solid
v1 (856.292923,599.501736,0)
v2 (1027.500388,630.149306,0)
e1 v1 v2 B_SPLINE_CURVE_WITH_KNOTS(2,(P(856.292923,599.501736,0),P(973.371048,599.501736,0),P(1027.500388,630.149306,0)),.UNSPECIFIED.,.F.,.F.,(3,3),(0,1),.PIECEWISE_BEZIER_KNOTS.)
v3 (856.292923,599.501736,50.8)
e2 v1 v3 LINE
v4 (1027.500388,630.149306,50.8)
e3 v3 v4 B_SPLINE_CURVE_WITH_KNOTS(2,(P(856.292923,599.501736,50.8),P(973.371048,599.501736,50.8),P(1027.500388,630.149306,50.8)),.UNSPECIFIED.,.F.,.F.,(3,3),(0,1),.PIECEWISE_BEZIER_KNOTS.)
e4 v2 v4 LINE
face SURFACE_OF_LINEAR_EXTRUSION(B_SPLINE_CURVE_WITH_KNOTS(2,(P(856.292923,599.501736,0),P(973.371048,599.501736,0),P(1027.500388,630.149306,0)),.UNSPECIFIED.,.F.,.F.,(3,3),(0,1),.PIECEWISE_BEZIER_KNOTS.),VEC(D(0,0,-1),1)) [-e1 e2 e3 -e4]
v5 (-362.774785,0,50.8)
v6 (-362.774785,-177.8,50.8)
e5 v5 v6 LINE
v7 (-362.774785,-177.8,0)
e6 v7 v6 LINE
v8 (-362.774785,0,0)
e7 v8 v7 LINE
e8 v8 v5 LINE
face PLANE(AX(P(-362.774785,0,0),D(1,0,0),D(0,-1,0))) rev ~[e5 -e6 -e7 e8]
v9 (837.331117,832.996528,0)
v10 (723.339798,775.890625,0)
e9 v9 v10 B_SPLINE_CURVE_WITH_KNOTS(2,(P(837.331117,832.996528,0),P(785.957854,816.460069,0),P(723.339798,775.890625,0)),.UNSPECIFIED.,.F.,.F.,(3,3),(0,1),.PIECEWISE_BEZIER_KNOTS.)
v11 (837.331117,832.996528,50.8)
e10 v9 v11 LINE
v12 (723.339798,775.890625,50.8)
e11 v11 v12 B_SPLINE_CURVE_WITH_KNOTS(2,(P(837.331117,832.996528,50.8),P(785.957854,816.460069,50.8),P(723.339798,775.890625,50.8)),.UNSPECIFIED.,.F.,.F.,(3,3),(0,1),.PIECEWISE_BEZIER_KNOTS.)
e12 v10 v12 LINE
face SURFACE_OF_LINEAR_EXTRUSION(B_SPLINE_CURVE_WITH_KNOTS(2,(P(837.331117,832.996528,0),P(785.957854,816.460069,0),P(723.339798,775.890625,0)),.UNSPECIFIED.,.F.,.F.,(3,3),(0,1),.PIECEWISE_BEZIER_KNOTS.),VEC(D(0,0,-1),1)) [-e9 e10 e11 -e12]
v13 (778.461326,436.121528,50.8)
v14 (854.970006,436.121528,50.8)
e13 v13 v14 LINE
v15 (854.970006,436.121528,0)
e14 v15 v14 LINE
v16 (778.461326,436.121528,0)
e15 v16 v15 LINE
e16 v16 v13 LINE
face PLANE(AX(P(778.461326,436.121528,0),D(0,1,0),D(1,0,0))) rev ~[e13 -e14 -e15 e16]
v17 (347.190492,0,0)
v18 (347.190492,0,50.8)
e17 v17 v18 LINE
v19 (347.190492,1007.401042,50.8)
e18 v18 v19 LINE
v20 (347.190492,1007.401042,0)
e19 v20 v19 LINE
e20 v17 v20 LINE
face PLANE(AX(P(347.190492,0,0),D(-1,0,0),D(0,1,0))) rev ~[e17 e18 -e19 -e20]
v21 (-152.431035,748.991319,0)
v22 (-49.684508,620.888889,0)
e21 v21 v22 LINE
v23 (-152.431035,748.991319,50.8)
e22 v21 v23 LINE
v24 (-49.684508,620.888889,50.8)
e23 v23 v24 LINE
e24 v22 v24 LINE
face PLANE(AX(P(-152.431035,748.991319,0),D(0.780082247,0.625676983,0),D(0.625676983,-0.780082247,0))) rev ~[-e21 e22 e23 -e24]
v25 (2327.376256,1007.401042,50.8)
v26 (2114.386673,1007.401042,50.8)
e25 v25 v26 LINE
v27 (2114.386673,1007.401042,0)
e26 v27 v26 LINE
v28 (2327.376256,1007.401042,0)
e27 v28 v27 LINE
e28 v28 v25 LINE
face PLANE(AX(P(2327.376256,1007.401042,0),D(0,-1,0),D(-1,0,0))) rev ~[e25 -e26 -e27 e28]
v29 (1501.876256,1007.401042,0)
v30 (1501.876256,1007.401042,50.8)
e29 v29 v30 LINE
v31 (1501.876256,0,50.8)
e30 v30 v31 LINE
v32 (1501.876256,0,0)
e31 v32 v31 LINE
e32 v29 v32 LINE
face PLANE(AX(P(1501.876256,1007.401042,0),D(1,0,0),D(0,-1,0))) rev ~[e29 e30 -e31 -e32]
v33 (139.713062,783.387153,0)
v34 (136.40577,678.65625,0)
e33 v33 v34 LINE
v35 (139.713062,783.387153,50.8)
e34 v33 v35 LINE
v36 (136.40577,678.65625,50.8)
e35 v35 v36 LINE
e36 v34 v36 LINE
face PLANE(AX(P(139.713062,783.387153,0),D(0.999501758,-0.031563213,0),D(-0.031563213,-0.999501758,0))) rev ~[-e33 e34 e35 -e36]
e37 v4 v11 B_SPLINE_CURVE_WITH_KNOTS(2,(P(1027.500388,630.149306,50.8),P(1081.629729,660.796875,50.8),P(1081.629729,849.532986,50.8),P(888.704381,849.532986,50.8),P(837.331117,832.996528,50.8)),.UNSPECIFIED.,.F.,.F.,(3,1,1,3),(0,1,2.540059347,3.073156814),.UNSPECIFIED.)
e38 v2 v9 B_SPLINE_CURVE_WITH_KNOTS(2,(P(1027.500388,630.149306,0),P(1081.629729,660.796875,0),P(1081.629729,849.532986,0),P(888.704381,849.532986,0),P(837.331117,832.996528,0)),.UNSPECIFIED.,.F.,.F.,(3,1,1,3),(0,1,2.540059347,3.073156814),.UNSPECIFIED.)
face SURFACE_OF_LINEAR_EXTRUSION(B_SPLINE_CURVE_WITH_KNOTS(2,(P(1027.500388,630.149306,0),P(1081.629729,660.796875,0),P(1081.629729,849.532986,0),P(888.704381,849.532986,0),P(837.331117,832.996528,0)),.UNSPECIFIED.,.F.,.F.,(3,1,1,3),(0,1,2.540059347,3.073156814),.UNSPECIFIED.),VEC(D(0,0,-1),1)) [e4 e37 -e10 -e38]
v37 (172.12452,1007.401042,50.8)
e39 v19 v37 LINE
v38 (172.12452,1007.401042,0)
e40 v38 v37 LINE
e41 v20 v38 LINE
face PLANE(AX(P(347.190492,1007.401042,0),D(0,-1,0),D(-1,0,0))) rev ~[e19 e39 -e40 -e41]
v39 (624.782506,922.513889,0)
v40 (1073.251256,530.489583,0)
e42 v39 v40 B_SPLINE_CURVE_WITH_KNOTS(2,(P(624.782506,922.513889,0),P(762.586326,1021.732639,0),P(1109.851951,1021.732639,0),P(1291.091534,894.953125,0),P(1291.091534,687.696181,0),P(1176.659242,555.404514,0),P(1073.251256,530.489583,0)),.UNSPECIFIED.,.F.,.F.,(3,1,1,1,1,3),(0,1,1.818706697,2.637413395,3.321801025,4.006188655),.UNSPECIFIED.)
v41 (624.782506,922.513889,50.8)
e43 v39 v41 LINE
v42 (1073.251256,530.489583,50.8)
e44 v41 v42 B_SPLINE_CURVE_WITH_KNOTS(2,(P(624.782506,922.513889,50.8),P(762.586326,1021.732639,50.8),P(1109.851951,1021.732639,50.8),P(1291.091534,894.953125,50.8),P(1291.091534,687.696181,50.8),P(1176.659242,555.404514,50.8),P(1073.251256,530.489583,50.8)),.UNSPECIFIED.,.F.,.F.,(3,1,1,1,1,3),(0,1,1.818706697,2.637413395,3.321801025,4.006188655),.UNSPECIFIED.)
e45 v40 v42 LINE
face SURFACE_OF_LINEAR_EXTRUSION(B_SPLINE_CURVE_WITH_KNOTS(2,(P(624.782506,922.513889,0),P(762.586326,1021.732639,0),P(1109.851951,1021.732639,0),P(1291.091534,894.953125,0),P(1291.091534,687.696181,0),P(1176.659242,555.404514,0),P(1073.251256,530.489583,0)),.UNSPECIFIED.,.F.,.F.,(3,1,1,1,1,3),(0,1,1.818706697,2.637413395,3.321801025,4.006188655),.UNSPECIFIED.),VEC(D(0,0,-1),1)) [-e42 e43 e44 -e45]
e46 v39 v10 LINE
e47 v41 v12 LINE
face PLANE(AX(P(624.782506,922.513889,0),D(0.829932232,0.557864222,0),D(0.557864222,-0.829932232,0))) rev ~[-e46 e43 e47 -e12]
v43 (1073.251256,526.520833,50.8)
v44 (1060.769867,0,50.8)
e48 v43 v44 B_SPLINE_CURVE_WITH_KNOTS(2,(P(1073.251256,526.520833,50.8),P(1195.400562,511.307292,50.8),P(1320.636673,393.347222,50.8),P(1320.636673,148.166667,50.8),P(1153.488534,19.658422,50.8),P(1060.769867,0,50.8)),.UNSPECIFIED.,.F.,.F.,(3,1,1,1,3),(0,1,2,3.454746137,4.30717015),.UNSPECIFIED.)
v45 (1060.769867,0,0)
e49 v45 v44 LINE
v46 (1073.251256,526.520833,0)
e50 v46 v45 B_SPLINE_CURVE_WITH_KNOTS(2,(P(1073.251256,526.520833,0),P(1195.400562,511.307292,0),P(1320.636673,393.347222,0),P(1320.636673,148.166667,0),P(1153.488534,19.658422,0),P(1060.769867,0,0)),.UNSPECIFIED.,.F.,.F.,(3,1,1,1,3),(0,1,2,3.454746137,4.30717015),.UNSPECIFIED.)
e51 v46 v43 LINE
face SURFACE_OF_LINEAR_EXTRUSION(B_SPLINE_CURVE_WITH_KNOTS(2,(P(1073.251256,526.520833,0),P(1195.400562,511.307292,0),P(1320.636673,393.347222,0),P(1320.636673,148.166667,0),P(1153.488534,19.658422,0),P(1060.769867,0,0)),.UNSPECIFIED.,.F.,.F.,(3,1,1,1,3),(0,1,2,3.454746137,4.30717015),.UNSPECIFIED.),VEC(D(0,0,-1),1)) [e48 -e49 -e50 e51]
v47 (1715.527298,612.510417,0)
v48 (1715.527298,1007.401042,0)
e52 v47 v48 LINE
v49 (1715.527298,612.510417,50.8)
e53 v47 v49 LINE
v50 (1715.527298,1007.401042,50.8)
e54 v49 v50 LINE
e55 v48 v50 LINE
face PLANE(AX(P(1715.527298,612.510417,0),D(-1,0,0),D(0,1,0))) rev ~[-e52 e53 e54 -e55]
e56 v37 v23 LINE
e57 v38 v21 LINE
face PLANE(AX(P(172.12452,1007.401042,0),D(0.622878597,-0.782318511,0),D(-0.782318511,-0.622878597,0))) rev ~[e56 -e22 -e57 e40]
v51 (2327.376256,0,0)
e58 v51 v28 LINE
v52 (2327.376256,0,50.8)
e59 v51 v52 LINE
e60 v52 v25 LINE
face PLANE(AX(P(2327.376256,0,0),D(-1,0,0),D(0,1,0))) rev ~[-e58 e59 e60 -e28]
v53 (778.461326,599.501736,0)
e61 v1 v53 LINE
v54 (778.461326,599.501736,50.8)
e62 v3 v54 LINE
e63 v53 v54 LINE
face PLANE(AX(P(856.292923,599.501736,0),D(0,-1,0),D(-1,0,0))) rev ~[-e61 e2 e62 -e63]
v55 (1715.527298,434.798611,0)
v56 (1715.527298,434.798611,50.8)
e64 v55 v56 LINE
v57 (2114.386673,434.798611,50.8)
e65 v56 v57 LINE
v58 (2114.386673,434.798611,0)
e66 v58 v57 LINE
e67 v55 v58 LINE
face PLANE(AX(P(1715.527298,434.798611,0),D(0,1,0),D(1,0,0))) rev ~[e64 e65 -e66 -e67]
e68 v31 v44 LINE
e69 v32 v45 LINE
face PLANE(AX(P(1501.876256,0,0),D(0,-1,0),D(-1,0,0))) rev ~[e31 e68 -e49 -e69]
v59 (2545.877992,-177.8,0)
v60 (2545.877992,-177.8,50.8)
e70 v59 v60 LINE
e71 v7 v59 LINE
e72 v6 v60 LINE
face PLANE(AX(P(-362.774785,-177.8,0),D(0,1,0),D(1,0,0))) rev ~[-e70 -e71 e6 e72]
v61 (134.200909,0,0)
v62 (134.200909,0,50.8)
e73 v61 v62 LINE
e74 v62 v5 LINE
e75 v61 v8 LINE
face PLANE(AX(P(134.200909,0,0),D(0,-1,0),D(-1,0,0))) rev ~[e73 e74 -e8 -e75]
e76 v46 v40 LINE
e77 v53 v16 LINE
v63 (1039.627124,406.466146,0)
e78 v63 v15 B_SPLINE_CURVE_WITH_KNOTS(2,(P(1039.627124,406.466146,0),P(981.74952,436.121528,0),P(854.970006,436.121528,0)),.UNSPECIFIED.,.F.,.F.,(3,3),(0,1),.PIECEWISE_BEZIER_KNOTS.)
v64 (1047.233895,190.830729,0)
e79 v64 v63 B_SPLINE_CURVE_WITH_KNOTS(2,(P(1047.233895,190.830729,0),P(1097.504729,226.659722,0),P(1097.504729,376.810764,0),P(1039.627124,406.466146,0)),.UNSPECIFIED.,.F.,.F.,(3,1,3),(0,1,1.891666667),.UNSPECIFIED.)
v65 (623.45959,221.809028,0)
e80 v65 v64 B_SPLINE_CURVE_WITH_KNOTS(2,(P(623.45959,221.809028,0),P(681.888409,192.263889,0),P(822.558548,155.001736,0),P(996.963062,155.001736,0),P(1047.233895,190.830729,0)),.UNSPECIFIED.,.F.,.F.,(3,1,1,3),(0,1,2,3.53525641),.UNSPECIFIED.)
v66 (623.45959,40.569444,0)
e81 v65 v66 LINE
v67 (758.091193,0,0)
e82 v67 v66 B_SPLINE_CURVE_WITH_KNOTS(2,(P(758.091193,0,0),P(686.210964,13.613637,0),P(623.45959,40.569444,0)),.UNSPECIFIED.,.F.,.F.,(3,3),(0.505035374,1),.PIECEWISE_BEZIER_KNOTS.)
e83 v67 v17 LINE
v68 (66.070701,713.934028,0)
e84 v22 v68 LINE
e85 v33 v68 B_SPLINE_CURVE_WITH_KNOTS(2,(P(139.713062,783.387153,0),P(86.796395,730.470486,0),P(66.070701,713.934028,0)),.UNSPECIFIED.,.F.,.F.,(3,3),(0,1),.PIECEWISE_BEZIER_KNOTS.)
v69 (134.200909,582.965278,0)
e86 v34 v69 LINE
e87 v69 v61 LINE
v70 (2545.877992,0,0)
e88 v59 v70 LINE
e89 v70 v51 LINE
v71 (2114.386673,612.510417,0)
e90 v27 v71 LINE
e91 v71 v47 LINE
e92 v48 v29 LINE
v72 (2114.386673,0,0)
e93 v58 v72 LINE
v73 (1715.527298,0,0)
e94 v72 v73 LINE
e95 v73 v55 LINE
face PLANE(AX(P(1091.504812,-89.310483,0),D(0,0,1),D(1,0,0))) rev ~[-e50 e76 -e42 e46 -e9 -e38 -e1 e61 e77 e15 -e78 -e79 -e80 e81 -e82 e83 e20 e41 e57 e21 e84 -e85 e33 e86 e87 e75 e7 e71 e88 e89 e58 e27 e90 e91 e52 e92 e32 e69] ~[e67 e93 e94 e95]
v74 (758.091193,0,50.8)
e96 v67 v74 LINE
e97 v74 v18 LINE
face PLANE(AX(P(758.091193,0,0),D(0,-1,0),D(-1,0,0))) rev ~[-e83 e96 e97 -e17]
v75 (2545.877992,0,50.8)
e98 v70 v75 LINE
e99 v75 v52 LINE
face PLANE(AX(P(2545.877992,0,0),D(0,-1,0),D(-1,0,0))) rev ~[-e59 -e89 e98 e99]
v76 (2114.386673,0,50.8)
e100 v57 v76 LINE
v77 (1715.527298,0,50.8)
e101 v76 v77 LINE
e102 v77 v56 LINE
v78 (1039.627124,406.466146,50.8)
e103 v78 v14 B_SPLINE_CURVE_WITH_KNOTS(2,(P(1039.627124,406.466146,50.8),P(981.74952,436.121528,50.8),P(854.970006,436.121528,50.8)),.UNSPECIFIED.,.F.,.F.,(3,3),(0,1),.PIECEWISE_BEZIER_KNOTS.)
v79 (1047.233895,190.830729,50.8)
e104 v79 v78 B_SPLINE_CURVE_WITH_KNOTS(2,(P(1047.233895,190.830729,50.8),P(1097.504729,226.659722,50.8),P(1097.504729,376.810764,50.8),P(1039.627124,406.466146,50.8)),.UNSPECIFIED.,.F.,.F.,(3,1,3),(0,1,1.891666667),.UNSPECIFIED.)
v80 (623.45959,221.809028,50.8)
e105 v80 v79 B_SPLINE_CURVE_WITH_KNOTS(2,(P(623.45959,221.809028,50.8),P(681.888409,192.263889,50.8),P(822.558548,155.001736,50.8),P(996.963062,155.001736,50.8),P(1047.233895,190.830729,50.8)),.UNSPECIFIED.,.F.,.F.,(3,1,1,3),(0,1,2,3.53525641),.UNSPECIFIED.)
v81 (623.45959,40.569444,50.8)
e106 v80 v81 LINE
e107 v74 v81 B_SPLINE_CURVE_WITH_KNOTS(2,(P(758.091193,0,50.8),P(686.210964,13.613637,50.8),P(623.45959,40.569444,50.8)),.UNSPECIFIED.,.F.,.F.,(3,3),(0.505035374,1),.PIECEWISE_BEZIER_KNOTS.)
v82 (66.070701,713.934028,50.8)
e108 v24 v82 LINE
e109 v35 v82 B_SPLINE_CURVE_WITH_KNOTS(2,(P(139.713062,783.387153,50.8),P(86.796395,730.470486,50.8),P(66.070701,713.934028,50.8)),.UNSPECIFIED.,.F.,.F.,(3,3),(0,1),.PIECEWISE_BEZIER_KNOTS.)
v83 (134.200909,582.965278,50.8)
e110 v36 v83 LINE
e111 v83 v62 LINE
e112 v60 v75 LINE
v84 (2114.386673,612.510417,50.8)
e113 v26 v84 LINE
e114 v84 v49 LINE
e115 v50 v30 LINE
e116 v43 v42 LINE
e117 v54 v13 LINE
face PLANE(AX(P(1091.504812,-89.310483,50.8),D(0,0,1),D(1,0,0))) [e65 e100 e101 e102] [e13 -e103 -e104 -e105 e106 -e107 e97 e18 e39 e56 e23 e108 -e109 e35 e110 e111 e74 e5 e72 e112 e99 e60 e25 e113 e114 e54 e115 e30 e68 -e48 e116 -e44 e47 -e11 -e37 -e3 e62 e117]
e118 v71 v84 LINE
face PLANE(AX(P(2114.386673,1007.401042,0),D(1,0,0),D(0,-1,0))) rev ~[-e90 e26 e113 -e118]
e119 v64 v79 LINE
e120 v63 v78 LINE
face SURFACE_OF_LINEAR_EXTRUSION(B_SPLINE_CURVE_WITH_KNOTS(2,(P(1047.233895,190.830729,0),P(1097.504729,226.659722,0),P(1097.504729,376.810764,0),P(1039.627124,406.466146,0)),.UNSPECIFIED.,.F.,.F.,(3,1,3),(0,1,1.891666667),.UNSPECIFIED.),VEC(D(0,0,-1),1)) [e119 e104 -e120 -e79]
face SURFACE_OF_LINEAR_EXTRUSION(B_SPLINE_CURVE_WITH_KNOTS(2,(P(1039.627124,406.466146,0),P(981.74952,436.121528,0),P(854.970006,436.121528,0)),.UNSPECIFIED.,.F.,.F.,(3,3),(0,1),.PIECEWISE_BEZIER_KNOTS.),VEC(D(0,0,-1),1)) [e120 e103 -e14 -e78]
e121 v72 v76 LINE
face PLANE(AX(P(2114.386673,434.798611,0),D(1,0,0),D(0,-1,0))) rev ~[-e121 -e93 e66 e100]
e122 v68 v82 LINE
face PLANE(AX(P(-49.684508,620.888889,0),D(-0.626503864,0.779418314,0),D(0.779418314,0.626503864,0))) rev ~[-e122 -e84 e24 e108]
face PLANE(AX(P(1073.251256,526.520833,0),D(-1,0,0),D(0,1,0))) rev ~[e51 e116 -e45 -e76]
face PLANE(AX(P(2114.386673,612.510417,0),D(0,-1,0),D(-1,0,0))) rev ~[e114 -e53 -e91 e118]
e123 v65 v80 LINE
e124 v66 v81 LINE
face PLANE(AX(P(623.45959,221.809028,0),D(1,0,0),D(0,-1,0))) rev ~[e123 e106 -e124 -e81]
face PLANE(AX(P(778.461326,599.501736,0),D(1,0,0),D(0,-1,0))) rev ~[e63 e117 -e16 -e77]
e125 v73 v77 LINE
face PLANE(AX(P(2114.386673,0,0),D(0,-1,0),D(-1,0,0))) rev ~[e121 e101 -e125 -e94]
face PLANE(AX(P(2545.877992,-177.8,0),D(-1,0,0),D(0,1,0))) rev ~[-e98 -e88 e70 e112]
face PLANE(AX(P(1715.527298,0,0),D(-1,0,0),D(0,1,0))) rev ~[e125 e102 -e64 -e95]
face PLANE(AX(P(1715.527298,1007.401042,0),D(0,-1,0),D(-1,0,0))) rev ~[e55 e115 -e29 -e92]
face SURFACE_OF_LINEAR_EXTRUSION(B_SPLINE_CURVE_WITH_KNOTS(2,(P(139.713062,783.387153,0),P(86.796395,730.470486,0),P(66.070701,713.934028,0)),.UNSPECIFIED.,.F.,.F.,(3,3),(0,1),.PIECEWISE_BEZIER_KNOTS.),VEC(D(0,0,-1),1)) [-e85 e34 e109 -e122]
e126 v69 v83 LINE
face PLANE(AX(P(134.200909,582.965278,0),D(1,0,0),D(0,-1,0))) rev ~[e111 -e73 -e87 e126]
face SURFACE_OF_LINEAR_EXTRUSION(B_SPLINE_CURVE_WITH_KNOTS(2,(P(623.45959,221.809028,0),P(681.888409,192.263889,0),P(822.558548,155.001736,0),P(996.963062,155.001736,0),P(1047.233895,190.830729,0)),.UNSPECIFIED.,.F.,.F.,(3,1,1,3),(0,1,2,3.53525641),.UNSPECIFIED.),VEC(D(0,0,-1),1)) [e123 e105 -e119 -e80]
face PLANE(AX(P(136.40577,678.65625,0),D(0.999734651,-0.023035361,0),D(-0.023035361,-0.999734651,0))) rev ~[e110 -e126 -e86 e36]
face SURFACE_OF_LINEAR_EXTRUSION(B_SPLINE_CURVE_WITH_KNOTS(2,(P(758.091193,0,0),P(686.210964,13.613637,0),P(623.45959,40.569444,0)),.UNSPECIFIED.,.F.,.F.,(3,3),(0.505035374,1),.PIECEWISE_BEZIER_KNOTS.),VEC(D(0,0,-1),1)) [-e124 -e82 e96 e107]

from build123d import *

# Parameters (mm, degrees)
F1_DEPTH = 50.8


# Not quite as in the source:
# - a feature names something its author has since deleted; it is built from what else it names


with BuildPart() as f1:
    # F0 (on Top) → F1 (new body)
    with BuildSketch(Plane.XY):
        with BuildLine():
            Line((-362.7747852802, 0), (-362.7747852802, -177.8))
            Line((-362.7747852802, -177.8), (2545.8779924975, -177.8))
            Line((2545.8779924975, -177.8), (2545.8779924975, 0))
            Line((2545.8779924975, 0), (2327.3762563864, 0))
            Line((2327.3762563864, 0), (2114.3866730531, 0))
            Line((2114.3866730531, 0), (1715.5272980531, 0))
            Line((1715.5272980531, 0), (1501.8762563864, 0))
            Line((1501.8762563864, 0), (1060.7698674064, 0))
            add(Edge.make_bspline(
                [(1060.7698674064, 0), (995.2549319361, -13.890625), (914.2807702753, -13.890625)],
                knots=[0.5859606644, 0.5859606644, 0.5859606644, 1, 1, 1], degree=2))
            add(Edge.make_bspline(
                [(914.2807702753, -13.890625), (831.4339258388, -13.890625), (758.0911932443, 0)],
                knots=[0, 0, 0, 0.5050353738, 0.5050353738, 0.5050353738], degree=2))
            Line((758.0911932443, 0), (347.1904924976, 0))
            Line((347.1904924976, 0), (134.2009091642, 0))
            Line((134.2009091642, 0), (-362.7747852802, 0))
        make_face()
        with BuildLine():
            Line((1060.7698674064, 0), (758.0911932443, 0))
            add(Edge.make_bspline(
                [(914.2807702753, -13.890625), (831.4339258388, -13.890625), (758.0911932443, 0)],
                knots=[0, 0, 0, 0.5050353738, 0.5050353738, 0.5050353738], degree=2))
            add(Edge.make_bspline(
                [(1060.7698674064, 0), (995.2549319361, -13.890625), (914.2807702753, -13.890625)],
                knots=[0.5859606644, 0.5859606644, 0.5859606644, 1, 1, 1], degree=2))
        make_face()
        with BuildLine():
            add(Edge.make_bspline(
                [(758.0911932443, 0), (686.2109644272, 13.6136365267), (623.4595897198, 40.5694444444)],
                knots=[0.5050353738, 0.5050353738, 0.5050353738, 1, 1, 1], degree=2))
            Line((758.0911932443, 0), (1060.7698674064, 0))
            add(Edge.make_bspline(
                [(1215.244311942, 67.1380208333), (1153.4885340032, 19.6584216858), (1060.7698674064, 0)],
                knots=[0, 0, 0, 0.5859606644, 0.5859606644, 0.5859606644], degree=2))
            add(Edge.make_bspline(
                [(1320.6366730531, 293.4670138889), (1320.6366730531, 148.1666666667), (1215.244311942, 67.1380208333)],
                knots=[0, 0, 0, 1, 1, 1], degree=2))
            add(Edge.make_bspline(
                [(1258.0186174976, 452.3272569444), (1320.6366730531, 393.3472222222), (1320.6366730531, 293.4670138889)],
                knots=[0, 0, 0, 1, 1, 1], degree=2))
            add(Edge.make_bspline(
                [(1073.2512563864, 526.5208333333), (1195.400561942, 511.3072916667), (1258.0186174976, 452.3272569444)],
                knots=[0, 0, 0, 1, 1, 1], degree=2))
            Line((1073.2512563864, 526.5208333333), (1073.2512563864, 530.4895833333))
            add(Edge.make_bspline(
                [(1233.8753883309, 621.5503472222), (1176.6592424976, 555.4045138889), (1073.2512563864, 530.4895833333)],
                knots=[0, 0, 0, 1, 1, 1], degree=2))
            add(Edge.make_bspline(
                [(1291.0915341642, 782.0642361111), (1291.0915341642, 687.6961805556), (1233.8753883309, 621.5503472222)],
                knots=[0, 0, 0, 1, 1, 1], degree=2))
            add(Edge.make_bspline(
                [(1200.4717424976, 958.3428819444), (1291.0915341642, 894.953125), (1291.0915341642, 782.0642361111)],
                knots=[0, 0, 0, 1, 1, 1], degree=2))
            add(Edge.make_bspline(
                [(953.5272980531, 1021.7326388889), (1109.8519508309, 1021.7326388889), (1200.4717424976, 958.3428819444)],
                knots=[0, 0, 0, 1, 1, 1], degree=2))
            add(Edge.make_bspline(
                [(624.7825063864, 922.5138888889), (762.5863258309, 1021.7326388889), (953.5272980531, 1021.7326388889)],
                knots=[0, 0, 0, 1, 1, 1], degree=2))
            Line((624.7825063864, 922.5138888889), (723.3397980531, 775.890625))
            add(Edge.make_bspline(
                [(837.3311174976, 832.9965277778), (785.9578536087, 816.4600694444), (723.3397980531, 775.890625)],
                knots=[0, 0, 0, 1, 1, 1], degree=2))
            add(Edge.make_bspline(
                [(938.3137563864, 849.5329861111), (888.7043813864, 849.5329861111), (837.3311174976, 832.9965277778)],
                knots=[0, 0, 0, 1, 1, 1], degree=2))
            add(Edge.make_bspline(
                [(1081.6297286087, 735.1006944444), (1081.6297286087, 849.5329861111), (938.3137563864, 849.5329861111)],
                knots=[0, 0, 0, 1, 1, 1], degree=2))
            add(Edge.make_bspline(
                [(1027.5003883309, 630.1493055556), (1081.6297286087, 660.796875), (1081.6297286087, 735.1006944444)],
                knots=[0, 0, 0, 1, 1, 1], degree=2))
            add(Edge.make_bspline(
                [(856.2929230531, 599.5017361111), (973.3710480531, 599.5017361111), (1027.5003883309, 630.1493055556)],
                knots=[0, 0, 0, 1, 1, 1], degree=2))
            Line((856.2929230531, 599.5017361111), (778.4613258309, 599.5017361111))
            Line((778.4613258309, 599.5017361111), (778.4613258309, 436.1215277778))
            Line((778.4613258309, 436.1215277778), (854.9700063864, 436.1215277778))
            add(Edge.make_bspline(
                [(1039.627124442, 406.4661458333), (981.7495202753, 436.1215277778), (854.9700063864, 436.1215277778)],
                knots=[0, 0, 0, 1, 1, 1], degree=2))
            add(Edge.make_bspline(
                [(1097.5047286087, 306.0347222222), (1097.5047286087, 376.8107638889), (1039.627124442, 406.4661458333)],
                knots=[0, 0, 0, 1, 1, 1], degree=2))
            add(Edge.make_bspline(
                [(1047.2338952753, 190.8307291667), (1097.5047286087, 226.6597222222), (1097.5047286087, 306.0347222222)],
                knots=[0, 0, 0, 1, 1, 1], degree=2))
            add(Edge.make_bspline(
                [(891.3502147198, 155.0017361111), (996.963061942, 155.0017361111), (1047.2338952753, 190.8307291667)],
                knots=[0, 0, 0, 1, 1, 1], degree=2))
            add(Edge.make_bspline(
                [(752.2234786087, 173.6328125), (822.5585480531, 155.0017361111), (891.3502147198, 155.0017361111)],
                knots=[0, 0, 0, 1, 1, 1], degree=2))
            add(Edge.make_bspline(
                [(623.4595897198, 221.8090277778), (681.8884091642, 192.2638888889), (752.2234786087, 173.6328125)],
                knots=[0, 0, 0, 1, 1, 1], degree=2))
            Line((623.4595897198, 221.8090277778), (623.4595897198, 40.5694444444))
        make_face()
        Polygon((2114.3866730531, 0), (2327.3762563864, 0), (2327.3762563864, 1007.4010416667), (2114.3866730531, 1007.4010416667), (2114.3866730531, 612.5104166667), (1715.5272980531, 612.5104166667), (1715.5272980531, 1007.4010416667), (1501.8762563864, 1007.4010416667), (1501.8762563864, 0), (1715.5272980531, 0), (1715.5272980531, 434.7986111111), (2114.3866730531, 434.7986111111), align=None)
        with BuildLine():
            Line((134.2009091642, 582.9652777778), (134.2009091642, 0))
            Line((134.2009091642, 0), (347.1904924976, 0))
            Line((347.1904924976, 0), (347.1904924976, 1007.4010416667))
            Line((347.1904924976, 1007.4010416667), (172.1245202753, 1007.4010416667))
            Line((172.1245202753, 1007.4010416667), (-152.4310352802, 748.9913194444))
            Line((-152.4310352802, 748.9913194444), (-49.6845075024, 620.8888888889))
            Line((-49.6845075024, 620.8888888889), (66.0707008309, 713.9340277778))
            add(Edge.make_bspline(
                [(139.713061942, 783.3871527778), (86.7963952753, 730.4704861111), (66.0707008309, 713.9340277778)],
                knots=[0, 0, 0, 1, 1, 1], degree=2))
            Line((139.713061942, 783.3871527778), (136.4057702753, 678.65625))
            Line((136.4057702753, 678.65625), (134.2009091642, 582.9652777778))
        make_face()
    extrude(amount=F1_DEPTH)


solid = f1.part
